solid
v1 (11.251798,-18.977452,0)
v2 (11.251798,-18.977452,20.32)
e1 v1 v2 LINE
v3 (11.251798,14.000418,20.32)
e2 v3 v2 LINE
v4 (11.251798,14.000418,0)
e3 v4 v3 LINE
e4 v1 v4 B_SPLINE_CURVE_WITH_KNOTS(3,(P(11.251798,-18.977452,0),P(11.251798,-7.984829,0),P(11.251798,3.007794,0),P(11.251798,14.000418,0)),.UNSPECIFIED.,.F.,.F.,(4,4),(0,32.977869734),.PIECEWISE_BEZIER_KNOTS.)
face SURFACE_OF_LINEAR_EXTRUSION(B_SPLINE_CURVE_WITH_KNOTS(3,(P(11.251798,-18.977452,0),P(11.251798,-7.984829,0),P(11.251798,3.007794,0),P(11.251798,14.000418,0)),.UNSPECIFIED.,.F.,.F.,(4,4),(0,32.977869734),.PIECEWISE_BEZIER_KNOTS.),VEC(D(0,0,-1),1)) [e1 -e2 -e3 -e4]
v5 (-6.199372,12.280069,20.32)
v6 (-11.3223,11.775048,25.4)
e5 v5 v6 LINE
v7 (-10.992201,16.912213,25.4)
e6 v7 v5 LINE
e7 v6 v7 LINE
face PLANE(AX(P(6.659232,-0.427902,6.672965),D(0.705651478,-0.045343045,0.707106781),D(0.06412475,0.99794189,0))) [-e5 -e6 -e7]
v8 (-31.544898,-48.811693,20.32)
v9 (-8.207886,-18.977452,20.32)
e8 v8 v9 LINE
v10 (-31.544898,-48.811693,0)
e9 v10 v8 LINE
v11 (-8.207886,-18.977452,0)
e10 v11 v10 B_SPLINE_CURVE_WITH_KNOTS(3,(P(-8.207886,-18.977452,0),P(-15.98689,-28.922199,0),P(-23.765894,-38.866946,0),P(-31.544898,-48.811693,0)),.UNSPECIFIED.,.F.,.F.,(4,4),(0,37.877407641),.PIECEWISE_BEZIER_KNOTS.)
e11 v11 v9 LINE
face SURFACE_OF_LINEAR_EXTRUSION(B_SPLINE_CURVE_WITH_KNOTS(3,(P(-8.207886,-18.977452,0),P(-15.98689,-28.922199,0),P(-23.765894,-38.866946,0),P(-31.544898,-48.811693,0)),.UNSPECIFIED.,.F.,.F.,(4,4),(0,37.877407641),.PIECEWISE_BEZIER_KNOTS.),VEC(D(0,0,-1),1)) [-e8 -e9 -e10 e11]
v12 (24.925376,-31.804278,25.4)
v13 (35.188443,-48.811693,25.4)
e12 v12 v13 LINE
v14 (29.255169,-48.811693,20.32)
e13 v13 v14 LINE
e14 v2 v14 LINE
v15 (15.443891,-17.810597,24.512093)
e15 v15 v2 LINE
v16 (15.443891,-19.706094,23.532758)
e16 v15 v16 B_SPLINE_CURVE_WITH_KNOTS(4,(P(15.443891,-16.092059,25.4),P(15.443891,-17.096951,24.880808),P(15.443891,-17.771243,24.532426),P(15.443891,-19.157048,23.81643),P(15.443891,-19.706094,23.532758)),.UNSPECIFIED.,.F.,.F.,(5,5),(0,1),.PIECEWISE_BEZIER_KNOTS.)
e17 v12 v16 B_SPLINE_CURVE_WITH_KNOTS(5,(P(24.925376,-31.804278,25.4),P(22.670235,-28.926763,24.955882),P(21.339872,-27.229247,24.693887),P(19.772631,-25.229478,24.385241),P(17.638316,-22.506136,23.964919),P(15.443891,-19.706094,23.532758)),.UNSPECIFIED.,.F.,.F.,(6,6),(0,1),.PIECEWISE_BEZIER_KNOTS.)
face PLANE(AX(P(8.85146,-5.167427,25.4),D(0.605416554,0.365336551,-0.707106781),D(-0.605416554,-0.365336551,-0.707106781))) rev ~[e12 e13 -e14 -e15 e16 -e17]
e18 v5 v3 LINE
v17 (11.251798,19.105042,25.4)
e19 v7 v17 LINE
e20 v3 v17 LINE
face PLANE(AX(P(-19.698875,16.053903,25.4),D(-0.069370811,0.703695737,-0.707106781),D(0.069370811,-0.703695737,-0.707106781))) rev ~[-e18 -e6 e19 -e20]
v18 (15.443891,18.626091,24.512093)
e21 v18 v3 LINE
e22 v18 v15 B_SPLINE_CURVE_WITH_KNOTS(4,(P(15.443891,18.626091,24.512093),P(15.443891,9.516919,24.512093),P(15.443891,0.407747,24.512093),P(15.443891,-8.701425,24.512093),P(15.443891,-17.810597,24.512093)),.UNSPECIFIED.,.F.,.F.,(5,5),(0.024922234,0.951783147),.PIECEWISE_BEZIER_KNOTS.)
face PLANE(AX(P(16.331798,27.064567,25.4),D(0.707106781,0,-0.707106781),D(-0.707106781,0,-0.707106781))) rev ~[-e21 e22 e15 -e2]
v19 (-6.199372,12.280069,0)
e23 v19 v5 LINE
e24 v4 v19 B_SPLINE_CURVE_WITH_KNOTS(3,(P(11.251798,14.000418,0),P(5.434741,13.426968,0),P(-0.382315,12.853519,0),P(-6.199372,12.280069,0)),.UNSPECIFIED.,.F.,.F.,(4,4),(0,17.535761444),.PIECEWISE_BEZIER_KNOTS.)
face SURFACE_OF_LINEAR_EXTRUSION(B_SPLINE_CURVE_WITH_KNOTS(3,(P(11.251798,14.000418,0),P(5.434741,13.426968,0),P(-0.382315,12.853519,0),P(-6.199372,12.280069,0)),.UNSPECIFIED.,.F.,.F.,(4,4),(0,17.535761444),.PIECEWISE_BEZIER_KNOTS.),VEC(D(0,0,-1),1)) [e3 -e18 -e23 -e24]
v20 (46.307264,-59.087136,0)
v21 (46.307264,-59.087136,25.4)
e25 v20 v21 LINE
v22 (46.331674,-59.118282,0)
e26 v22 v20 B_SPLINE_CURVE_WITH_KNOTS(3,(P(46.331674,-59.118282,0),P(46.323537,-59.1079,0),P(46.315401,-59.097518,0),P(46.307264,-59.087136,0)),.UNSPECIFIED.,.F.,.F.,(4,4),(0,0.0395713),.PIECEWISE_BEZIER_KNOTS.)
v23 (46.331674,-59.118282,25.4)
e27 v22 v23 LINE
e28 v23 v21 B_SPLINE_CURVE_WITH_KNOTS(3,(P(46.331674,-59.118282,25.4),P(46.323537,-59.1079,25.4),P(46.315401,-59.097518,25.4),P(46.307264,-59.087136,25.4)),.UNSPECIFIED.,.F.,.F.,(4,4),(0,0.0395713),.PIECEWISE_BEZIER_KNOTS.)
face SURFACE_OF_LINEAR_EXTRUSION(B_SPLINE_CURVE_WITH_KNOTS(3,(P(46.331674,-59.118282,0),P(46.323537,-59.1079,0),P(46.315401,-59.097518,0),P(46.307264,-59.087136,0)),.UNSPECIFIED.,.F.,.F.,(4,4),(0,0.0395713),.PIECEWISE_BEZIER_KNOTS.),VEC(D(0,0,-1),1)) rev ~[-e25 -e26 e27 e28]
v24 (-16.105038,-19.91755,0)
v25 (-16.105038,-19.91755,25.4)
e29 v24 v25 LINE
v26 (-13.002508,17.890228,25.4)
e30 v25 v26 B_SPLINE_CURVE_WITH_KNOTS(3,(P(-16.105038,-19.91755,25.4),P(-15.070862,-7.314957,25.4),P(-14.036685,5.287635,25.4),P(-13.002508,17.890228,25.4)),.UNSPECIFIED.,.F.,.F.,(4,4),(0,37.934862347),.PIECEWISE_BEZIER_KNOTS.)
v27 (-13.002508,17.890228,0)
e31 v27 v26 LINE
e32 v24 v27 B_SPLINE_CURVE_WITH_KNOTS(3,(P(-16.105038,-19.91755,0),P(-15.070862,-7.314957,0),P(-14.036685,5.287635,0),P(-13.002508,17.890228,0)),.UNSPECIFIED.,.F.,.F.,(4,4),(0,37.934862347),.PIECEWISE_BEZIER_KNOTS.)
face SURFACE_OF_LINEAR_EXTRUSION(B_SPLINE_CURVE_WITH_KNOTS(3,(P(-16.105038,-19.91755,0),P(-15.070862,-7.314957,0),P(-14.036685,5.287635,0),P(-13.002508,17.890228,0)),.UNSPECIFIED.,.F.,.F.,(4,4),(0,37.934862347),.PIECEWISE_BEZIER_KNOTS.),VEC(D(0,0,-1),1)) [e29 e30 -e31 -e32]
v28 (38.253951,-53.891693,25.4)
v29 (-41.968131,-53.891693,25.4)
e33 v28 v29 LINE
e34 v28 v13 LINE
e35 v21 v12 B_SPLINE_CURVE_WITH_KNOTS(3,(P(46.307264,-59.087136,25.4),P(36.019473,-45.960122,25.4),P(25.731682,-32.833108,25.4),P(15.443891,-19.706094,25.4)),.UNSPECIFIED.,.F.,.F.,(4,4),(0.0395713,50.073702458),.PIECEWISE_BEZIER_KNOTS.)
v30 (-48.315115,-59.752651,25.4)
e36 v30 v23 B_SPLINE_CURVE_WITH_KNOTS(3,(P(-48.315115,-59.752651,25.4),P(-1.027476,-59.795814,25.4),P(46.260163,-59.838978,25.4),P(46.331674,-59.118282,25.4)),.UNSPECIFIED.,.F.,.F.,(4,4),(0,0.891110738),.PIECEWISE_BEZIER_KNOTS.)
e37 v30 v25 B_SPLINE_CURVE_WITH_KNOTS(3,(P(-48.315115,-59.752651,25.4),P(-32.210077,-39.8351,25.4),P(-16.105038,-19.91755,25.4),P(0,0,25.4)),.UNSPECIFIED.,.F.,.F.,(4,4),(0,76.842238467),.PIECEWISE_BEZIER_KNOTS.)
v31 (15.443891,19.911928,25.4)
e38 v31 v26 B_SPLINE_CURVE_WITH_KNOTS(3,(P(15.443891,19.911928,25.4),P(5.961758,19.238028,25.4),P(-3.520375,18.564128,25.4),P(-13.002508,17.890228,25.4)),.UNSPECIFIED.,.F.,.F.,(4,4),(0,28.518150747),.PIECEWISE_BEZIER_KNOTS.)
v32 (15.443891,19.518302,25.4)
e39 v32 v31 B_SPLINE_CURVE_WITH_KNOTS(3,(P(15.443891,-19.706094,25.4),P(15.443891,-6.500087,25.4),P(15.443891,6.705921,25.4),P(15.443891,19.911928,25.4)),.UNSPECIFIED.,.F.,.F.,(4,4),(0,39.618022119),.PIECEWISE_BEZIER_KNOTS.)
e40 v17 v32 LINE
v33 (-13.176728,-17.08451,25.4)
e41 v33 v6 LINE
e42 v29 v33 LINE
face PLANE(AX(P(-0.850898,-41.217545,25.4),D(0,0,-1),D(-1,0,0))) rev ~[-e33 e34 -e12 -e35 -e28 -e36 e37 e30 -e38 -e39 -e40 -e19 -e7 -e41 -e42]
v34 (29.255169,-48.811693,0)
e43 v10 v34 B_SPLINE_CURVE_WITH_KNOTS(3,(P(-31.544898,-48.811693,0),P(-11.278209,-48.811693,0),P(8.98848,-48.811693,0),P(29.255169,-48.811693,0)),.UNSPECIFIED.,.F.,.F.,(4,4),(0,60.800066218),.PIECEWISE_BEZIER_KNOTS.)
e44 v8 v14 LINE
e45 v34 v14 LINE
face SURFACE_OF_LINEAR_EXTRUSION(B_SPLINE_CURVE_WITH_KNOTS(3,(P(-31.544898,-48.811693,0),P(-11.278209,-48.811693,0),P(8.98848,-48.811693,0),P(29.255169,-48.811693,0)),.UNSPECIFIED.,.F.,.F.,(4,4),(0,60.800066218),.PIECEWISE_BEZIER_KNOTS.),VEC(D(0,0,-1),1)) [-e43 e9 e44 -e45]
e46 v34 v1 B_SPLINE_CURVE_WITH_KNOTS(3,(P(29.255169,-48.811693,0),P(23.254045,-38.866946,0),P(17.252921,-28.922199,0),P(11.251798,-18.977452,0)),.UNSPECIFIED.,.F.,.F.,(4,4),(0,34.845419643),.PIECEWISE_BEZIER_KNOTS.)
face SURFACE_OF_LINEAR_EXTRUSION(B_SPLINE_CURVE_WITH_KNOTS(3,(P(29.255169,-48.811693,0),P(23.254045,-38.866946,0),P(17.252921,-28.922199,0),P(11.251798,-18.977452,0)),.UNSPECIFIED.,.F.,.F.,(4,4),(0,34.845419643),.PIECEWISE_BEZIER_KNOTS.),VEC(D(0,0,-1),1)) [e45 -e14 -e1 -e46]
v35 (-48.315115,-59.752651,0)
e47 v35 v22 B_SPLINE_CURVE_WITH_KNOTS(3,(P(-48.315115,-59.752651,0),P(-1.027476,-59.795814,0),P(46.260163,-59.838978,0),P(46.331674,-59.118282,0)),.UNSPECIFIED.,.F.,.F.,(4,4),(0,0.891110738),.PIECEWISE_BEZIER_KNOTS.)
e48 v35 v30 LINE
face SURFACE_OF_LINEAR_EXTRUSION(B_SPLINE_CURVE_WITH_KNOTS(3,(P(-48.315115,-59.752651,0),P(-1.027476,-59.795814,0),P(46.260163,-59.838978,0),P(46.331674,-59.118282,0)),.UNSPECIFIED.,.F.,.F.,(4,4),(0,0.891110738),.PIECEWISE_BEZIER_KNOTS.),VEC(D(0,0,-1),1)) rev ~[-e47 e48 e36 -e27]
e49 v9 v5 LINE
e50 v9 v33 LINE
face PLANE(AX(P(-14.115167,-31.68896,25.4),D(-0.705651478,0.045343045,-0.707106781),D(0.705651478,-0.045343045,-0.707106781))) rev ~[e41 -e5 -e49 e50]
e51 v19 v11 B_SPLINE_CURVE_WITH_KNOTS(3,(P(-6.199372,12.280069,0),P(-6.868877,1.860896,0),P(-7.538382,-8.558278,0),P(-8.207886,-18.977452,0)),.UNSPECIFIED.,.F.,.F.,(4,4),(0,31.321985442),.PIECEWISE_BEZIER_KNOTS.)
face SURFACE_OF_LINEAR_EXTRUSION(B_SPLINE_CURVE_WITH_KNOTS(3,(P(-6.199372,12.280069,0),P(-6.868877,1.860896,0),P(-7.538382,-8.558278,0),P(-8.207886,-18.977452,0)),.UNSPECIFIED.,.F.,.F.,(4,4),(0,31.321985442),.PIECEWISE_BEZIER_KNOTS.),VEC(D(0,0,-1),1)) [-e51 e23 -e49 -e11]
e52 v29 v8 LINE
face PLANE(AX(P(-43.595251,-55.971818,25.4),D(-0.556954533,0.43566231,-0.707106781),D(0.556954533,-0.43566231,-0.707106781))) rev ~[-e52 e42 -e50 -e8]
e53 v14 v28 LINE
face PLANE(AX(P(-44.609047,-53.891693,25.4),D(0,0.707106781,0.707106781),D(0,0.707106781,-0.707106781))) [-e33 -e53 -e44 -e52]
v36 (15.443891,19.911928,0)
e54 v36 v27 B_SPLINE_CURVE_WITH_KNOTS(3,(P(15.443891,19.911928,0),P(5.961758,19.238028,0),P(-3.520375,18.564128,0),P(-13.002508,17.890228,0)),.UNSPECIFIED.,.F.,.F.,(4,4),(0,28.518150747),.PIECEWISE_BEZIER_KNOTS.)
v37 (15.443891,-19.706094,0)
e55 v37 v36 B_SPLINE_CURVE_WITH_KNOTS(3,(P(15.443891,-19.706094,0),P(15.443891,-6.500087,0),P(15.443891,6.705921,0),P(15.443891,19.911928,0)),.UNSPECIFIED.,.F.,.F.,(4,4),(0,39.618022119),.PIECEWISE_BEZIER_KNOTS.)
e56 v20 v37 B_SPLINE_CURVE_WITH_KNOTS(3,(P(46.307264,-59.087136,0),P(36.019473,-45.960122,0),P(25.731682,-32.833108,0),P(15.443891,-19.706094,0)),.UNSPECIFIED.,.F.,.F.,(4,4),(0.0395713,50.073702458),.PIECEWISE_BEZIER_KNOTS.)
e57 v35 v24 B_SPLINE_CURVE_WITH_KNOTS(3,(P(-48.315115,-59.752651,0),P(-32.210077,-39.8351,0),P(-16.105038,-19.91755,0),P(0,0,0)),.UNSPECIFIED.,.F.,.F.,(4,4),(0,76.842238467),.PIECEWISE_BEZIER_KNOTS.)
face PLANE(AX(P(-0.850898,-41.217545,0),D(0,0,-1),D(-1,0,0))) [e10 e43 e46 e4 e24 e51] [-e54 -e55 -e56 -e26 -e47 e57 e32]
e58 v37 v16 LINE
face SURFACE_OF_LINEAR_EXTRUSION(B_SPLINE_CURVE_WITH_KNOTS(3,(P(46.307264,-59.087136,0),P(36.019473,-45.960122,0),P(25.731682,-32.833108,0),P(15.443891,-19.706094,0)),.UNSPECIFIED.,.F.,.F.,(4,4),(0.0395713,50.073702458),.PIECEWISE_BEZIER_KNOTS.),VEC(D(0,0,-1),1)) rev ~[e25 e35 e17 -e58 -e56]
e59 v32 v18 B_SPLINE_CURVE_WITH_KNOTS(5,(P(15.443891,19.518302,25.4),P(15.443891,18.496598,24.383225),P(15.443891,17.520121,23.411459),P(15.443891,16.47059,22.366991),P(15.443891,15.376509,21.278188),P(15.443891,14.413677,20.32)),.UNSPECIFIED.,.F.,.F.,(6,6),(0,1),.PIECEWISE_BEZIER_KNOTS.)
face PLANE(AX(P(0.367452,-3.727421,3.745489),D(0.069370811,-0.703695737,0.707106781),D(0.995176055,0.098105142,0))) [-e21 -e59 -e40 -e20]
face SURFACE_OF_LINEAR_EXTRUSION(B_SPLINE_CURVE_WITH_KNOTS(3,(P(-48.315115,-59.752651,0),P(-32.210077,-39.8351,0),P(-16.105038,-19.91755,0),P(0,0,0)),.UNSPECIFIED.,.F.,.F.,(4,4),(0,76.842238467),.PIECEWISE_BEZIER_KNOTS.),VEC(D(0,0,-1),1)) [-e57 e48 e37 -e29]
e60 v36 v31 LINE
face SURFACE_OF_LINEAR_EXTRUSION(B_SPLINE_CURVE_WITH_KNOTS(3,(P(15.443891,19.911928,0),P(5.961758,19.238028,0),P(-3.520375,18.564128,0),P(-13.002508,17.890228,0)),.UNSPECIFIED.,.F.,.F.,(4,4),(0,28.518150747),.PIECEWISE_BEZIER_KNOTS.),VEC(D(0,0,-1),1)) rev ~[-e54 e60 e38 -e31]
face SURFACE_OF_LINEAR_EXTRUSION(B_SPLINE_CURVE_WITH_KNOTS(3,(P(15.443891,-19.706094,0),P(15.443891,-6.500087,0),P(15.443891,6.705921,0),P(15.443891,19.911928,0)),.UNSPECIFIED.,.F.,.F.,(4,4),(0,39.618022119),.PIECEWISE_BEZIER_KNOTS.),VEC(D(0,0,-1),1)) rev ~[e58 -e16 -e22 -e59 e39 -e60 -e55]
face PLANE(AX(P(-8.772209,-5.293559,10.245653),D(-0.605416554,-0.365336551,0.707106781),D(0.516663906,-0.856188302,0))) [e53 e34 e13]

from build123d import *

# Parameters (mm, degrees)
F1_DEPTH     = 25.4
F3_DEPTH     = 50.8
F5_T4_DEPTH  = 64.0057067986
F5_T9_DEPTH  = 86.9283653755
F5_T15_DEPTH = 60.9737188004
F5_T20_DEPTH = 59.1061688919
F5_T25_DEPTH = 43.6640606018
F5_T31_DEPTH = 57.4502846001


# Not quite as in the source:
# - a fillet or chamfer that OpenCascade refuses, or shapes differently, is made with other operations: its cross-section is extruded or revolved along the edge and cut away or added
# - a feature of the source that left no trace in its solid (it failed there, or was rolled back) is left out


with BuildPart() as f1:
    # F0 (on Top) → F1 (new body)
    with BuildSketch(Plane.XY):
        with BuildLine():
            add(Edge.make_bspline(
                [(-48.315115273, -59.7526505589), (-37.5784229901, -46.4742837681), (-26.8417307072, -33.1959169772), (-16.1050384243, -19.9175501863)],
                knots=[0, 0, 0, 0, 51.2281589782, 51.2281589782, 51.2281589782, 51.2281589782], degree=3))
            add(Edge.make_bspline(
                [(-48.315115273, -59.7526505589), (-1.0274761031, -59.7958142001), (46.2601630669, -59.8389778412), (46.3316738605, -59.1182820499)],
                knots=[0, 0, 0, 0, 0.8911107377, 0.8911107377, 0.8911107377, 0.8911107377], degree=3))
            add(Edge.make_bspline(
                [(46.3316738605, -59.1182820499), (46.3235373894, -59.1079000767), (46.3154009182, -59.0975181035), (46.3072644471, -59.0871361303)],
                knots=[0, 0, 0, 0, 0.0395712999, 0.0395712999, 0.0395712999, 0.0395712999], degree=3))
            add(Edge.make_bspline(
                [(46.3072644471, -59.0871361303), (36.0194733937, -45.9601220924), (25.7316823403, -32.8331080545), (15.4438912868, -19.7060940166)],
                knots=[0.0395712999, 0.0395712999, 0.0395712999, 0.0395712999, 50.0737024584, 50.0737024584, 50.0737024584, 50.0737024584], degree=3))
            add(Edge.make_bspline(
                [(15.4438912868, -19.7060940166), (10.2959275246, -13.1373960111), (5.1479637623, -6.5686980055), (0, 0)],
                knots=[50.0737024584, 50.0737024584, 50.0737024584, 50.0737024584, 75.1105536876, 75.1105536876, 75.1105536876, 75.1105536876], degree=3))
            add(Edge.make_bspline(
                [(-16.1050384243, -19.9175501863), (-10.7366922829, -13.2783667909), (-5.3683461414, -6.6391833954), (0, 0)],
                knots=[51.2281589782, 51.2281589782, 51.2281589782, 51.2281589782, 76.8422384673, 76.8422384673, 76.8422384673, 76.8422384673], degree=3))
        make_face()
        with BuildLine():
            add(Edge.make_bspline(
                [(-16.1050384243, -19.9175501863), (-15.0708617229, -7.3149574714), (-14.0366850214, 5.2876352436), (-13.0025083199, 17.8902279586)],
                knots=[0, 0, 0, 0, 37.9348623472, 37.9348623472, 37.9348623472, 37.9348623472], degree=3))
            add(Edge.make_bspline(
                [(-16.1050384243, -19.9175501863), (-10.7366922829, -13.2783667909), (-5.3683461414, -6.6391833954), (0, 0)],
                knots=[51.2281589782, 51.2281589782, 51.2281589782, 51.2281589782, 76.8422384673, 76.8422384673, 76.8422384673, 76.8422384673], degree=3))
            add(Edge.make_bspline(
                [(15.4438912868, -19.7060940166), (10.2959275246, -13.1373960111), (5.1479637623, -6.5686980055), (0, 0)],
                knots=[50.0737024584, 50.0737024584, 50.0737024584, 50.0737024584, 75.1105536876, 75.1105536876, 75.1105536876, 75.1105536876], degree=3))
            add(Edge.make_bspline(
                [(15.4438912868, -19.7060940166), (15.4438912868, -6.5000866436), (15.4438912868, 6.7059207294), (15.4438912868, 19.9119281024)],
                knots=[0, 0, 0, 0, 39.618022119, 39.618022119, 39.618022119, 39.618022119], degree=3))
            add(Edge.make_bspline(
                [(15.4438912868, 19.9119281024), (5.9617580846, 19.2380280544), (-3.5203751177, 18.5641280065), (-13.0025083199, 17.8902279586)],
                knots=[0, 0, 0, 0, 28.5181507475, 28.5181507475, 28.5181507475, 28.5181507475], degree=3))
        make_face()
    extrude(amount=F1_DEPTH)

    # F2 (on Top) → F3 (cut)
    with BuildSketch(Plane.XY):
        with BuildLine():
            add(Edge.make_bspline(
                [(11.2517978996, 14.0004176646), (5.4347412661, 13.426968207), (-0.3823153675, 12.8535187493), (-6.199372001, 12.2800692916)],
                knots=[0, 0, 0, 0, 17.5357614441, 17.5357614441, 17.5357614441, 17.5357614441], degree=3))
            add(Edge.make_bspline(
                [(-6.199372001, 12.2800692916), (-6.8688768273, 1.8608955046), (-7.5383816535, -8.5582782825), (-8.2078864798, -18.9774520695)],
                knots=[0, 0, 0, 0, 31.3219854424, 31.3219854424, 31.3219854424, 31.3219854424], degree=3))
            add(Edge.make_bspline(
                [(-8.2078864798, -18.9774520695), (-15.9868902216, -28.9221989612), (-23.7658939635, -38.8669458528), (-31.5448977053, -48.8116927445)],
                knots=[0, 0, 0, 0, 37.8774076409, 37.8774076409, 37.8774076409, 37.8774076409], degree=3))
            add(Edge.make_bspline(
                [(-31.5448977053, -48.8116927445), (-14.2238239447, -48.8116927445), (3.0972498159, -48.8116927445), (20.4183235765, -48.8116927445)],
                knots=[0, 0, 0, 0, 51.9632212818, 51.9632212818, 51.9632212818, 51.9632212818], degree=3))
            add(Edge.make_bspline(
                [(20.4183235765, -48.8116927445), (23.3639385551, -48.8116927445), (26.3095535338, -48.8116927445), (29.2551685125, -48.8116927445)],
                knots=[0, 0, 0, 0, 8.836844936, 8.836844936, 8.836844936, 8.836844936], degree=3))
            add(Edge.make_bspline(
                [(29.2551685125, -48.8116927445), (23.2540449748, -38.8669458528), (17.2529214372, -28.9221989612), (11.2517978996, -18.9774520695)],
                knots=[0, 0, 0, 0, 34.8454196427, 34.8454196427, 34.8454196427, 34.8454196427], degree=3))
            add(Edge.make_bspline(
                [(11.2517978996, -18.9774520695), (11.2517978996, -7.9848288248), (11.2517978996, 3.0077944199), (11.2517978996, 14.0004176646)],
                knots=[0, 0, 0, 0, 32.9778697342, 32.9778697342, 32.9778697342, 32.9778697342], degree=3))
        make_face()
    extrude(amount=F3_DEPTH, mode=Mode.SUBTRACT)

    # F5: chamfer of 5.08 on 6 edges, made by hand


with BuildPart() as f5_tool2:
    # F5_s3 → F5_t4 (new body)
    with BuildSketch(Plane(origin=(-43.7113633895, -55.8809919142, 0), x_dir=(0, 0, 1), z_dir=(0.6161195467, 0.7876526545, 0))):
        Polygon((25.4, 0.1474155925), (20.32, 5.2274155925), (25.4, 5.2274155925), align=None)
    extrude(amount=F5_T4_DEPTH)

    split(bisect_by=Plane(origin=(0, -14.2458463722, -14.2458463722), x_dir=(1, 0, 0), z_dir=(0, 0.7071067812, 0.7071067812)), keep=Keep.TOP)


with BuildPart() as f1_1:
    add(f1.part)

    # F5_t1: cut F5_tool2
    add(f5_tool2.part, mode=Mode.SUBTRACT)


with BuildPart() as f5_tool7:
    # F5_s8 → F5_t9 (new body)
    with BuildSketch(Plane.YZ.offset(-44.6090472842)):
        Polygon((-53.8916927445, 25.4), (-48.8116927445, 20.32), (-48.8116927445, 25.4), align=None)
    extrude(amount=F5_T9_DEPTH)

    split(bisect_by=Plane(origin=(-8.7722085747, -5.293559296, 10.2456533856), x_dir=(0.5166639058, -0.856188302, 0), z_dir=(-0.6054165543, -0.3653365514, 0.7071067812)), keep=Keep.TOP)

    split(bisect_by=Plane(origin=(10.0612448539, -7.870131057, 12.7737077963), x_dir=(0.6161195467, 0.7876526545, 0), z_dir=(0.5569545332, -0.4356623095, 0.7071067812)), keep=Keep.TOP)


with BuildPart() as f1_2:
    add(f1_1.part)

    # F5_t6: cut F5_tool7
    add(f5_tool7.part, mode=Mode.SUBTRACT)


with BuildPart() as f5_tool13:
    # F5_s14 → F5_t15 (new body)
    with BuildSketch(Plane(origin=(4.6486942055, -7.7035719995, 0), x_dir=(0, 0, 1), z_dir=(0.5166639058, -0.856188302, 0))):
        Polygon((25.4, -4.9086932287), (20.32, 0.1713067713), (25.4, 0.1713067713), align=None)
    extrude(amount=F5_T15_DEPTH)

    split(bisect_by=Plane(origin=(0, -14.2458463722, -14.2458463722), x_dir=(1, 0, 0), z_dir=(0, 0.7071067812, 0.7071067812)), keep=Keep.TOP)


with BuildPart() as f1_3:
    add(f1_2.part)

    # F5_t12: cut F5_tool13
    add(f5_tool13.part, mode=Mode.SUBTRACT)


with BuildPart() as f5_tool18:
    # F5_s19 → F5_t20 (new body)
    with BuildSketch(Plane.XZ.offset(-27.0645672435)):
        Polygon((16.3317978996, 25.4), (11.2517978996, 20.32), (11.2517978996, 25.4), align=None)
    extrude(amount=F5_T20_DEPTH)

    split(bisect_by=Plane(origin=(0.3674517714, -3.7274213716, 3.7454894054), x_dir=(0.9951760553, 0.0981051424, 0), z_dir=(0.0693708114, -0.7036957372, 0.7071067812)), keep=Keep.TOP)


with BuildPart() as f1_4:
    add(f1_3.part)

    # F5_t17: cut F5_tool18
    add(f5_tool18.part, mode=Mode.SUBTRACT)


with BuildPart() as f5_tool23:
    # F5_s24 → F5_t25 (new body)
    with BuildSketch(Plane(origin=(-17.9419078945, -1.7687256632, 0), x_dir=(0, 0, 1), z_dir=(0.9951760553, 0.0981051424, 0))):
        Polygon((25.4, -17.9090211892), (20.32, -12.8290211892), (25.4, -12.8290211892), align=None)
    extrude(amount=F5_T25_DEPTH)

    split(bisect_by=Plane(origin=(6.6592316135, -0.4279022306, 6.672965308), x_dir=(0.0641247498, 0.9979418903, 0), z_dir=(0.7056514779, -0.0453430454, 0.7071067812)), keep=Keep.TOP)

    split(bisect_by=Plane(origin=(-4.5341010502, 0, 4.5341010502), x_dir=(0, 1, 0), z_dir=(-0.7071067812, 0, 0.7071067812)), keep=Keep.TOP)


with BuildPart() as f1_5:
    add(f1_4.part)

    # F5_t22: cut F5_tool23
    add(f5_tool23.part, mode=Mode.SUBTRACT)


with BuildPart() as f5_tool29:
    # F5_s30 → F5_t31 (new body)
    with BuildSketch(Plane(origin=(-2.0859058182, -32.4619246499, 0), x_dir=(0, 0, 1), z_dir=(0.0641247498, 0.9979418903, 0))):
        Polygon((25.4, -12.054069384), (20.32, -6.974069384), (25.4, -6.974069384), align=None)
    extrude(amount=F5_T31_DEPTH)

    split(bisect_by=Plane(origin=(0.3674517714, -3.7274213716, 3.7454894054), x_dir=(0.9951760553, 0.0981051424, 0), z_dir=(0.0693708114, -0.7036957372, 0.7071067812)), keep=Keep.TOP)


with BuildPart() as f1_6:
    add(f1_5.part)

    # F5_t28: cut F5_tool29
    add(f5_tool29.part, mode=Mode.SUBTRACT)


solid = f1_6.part
